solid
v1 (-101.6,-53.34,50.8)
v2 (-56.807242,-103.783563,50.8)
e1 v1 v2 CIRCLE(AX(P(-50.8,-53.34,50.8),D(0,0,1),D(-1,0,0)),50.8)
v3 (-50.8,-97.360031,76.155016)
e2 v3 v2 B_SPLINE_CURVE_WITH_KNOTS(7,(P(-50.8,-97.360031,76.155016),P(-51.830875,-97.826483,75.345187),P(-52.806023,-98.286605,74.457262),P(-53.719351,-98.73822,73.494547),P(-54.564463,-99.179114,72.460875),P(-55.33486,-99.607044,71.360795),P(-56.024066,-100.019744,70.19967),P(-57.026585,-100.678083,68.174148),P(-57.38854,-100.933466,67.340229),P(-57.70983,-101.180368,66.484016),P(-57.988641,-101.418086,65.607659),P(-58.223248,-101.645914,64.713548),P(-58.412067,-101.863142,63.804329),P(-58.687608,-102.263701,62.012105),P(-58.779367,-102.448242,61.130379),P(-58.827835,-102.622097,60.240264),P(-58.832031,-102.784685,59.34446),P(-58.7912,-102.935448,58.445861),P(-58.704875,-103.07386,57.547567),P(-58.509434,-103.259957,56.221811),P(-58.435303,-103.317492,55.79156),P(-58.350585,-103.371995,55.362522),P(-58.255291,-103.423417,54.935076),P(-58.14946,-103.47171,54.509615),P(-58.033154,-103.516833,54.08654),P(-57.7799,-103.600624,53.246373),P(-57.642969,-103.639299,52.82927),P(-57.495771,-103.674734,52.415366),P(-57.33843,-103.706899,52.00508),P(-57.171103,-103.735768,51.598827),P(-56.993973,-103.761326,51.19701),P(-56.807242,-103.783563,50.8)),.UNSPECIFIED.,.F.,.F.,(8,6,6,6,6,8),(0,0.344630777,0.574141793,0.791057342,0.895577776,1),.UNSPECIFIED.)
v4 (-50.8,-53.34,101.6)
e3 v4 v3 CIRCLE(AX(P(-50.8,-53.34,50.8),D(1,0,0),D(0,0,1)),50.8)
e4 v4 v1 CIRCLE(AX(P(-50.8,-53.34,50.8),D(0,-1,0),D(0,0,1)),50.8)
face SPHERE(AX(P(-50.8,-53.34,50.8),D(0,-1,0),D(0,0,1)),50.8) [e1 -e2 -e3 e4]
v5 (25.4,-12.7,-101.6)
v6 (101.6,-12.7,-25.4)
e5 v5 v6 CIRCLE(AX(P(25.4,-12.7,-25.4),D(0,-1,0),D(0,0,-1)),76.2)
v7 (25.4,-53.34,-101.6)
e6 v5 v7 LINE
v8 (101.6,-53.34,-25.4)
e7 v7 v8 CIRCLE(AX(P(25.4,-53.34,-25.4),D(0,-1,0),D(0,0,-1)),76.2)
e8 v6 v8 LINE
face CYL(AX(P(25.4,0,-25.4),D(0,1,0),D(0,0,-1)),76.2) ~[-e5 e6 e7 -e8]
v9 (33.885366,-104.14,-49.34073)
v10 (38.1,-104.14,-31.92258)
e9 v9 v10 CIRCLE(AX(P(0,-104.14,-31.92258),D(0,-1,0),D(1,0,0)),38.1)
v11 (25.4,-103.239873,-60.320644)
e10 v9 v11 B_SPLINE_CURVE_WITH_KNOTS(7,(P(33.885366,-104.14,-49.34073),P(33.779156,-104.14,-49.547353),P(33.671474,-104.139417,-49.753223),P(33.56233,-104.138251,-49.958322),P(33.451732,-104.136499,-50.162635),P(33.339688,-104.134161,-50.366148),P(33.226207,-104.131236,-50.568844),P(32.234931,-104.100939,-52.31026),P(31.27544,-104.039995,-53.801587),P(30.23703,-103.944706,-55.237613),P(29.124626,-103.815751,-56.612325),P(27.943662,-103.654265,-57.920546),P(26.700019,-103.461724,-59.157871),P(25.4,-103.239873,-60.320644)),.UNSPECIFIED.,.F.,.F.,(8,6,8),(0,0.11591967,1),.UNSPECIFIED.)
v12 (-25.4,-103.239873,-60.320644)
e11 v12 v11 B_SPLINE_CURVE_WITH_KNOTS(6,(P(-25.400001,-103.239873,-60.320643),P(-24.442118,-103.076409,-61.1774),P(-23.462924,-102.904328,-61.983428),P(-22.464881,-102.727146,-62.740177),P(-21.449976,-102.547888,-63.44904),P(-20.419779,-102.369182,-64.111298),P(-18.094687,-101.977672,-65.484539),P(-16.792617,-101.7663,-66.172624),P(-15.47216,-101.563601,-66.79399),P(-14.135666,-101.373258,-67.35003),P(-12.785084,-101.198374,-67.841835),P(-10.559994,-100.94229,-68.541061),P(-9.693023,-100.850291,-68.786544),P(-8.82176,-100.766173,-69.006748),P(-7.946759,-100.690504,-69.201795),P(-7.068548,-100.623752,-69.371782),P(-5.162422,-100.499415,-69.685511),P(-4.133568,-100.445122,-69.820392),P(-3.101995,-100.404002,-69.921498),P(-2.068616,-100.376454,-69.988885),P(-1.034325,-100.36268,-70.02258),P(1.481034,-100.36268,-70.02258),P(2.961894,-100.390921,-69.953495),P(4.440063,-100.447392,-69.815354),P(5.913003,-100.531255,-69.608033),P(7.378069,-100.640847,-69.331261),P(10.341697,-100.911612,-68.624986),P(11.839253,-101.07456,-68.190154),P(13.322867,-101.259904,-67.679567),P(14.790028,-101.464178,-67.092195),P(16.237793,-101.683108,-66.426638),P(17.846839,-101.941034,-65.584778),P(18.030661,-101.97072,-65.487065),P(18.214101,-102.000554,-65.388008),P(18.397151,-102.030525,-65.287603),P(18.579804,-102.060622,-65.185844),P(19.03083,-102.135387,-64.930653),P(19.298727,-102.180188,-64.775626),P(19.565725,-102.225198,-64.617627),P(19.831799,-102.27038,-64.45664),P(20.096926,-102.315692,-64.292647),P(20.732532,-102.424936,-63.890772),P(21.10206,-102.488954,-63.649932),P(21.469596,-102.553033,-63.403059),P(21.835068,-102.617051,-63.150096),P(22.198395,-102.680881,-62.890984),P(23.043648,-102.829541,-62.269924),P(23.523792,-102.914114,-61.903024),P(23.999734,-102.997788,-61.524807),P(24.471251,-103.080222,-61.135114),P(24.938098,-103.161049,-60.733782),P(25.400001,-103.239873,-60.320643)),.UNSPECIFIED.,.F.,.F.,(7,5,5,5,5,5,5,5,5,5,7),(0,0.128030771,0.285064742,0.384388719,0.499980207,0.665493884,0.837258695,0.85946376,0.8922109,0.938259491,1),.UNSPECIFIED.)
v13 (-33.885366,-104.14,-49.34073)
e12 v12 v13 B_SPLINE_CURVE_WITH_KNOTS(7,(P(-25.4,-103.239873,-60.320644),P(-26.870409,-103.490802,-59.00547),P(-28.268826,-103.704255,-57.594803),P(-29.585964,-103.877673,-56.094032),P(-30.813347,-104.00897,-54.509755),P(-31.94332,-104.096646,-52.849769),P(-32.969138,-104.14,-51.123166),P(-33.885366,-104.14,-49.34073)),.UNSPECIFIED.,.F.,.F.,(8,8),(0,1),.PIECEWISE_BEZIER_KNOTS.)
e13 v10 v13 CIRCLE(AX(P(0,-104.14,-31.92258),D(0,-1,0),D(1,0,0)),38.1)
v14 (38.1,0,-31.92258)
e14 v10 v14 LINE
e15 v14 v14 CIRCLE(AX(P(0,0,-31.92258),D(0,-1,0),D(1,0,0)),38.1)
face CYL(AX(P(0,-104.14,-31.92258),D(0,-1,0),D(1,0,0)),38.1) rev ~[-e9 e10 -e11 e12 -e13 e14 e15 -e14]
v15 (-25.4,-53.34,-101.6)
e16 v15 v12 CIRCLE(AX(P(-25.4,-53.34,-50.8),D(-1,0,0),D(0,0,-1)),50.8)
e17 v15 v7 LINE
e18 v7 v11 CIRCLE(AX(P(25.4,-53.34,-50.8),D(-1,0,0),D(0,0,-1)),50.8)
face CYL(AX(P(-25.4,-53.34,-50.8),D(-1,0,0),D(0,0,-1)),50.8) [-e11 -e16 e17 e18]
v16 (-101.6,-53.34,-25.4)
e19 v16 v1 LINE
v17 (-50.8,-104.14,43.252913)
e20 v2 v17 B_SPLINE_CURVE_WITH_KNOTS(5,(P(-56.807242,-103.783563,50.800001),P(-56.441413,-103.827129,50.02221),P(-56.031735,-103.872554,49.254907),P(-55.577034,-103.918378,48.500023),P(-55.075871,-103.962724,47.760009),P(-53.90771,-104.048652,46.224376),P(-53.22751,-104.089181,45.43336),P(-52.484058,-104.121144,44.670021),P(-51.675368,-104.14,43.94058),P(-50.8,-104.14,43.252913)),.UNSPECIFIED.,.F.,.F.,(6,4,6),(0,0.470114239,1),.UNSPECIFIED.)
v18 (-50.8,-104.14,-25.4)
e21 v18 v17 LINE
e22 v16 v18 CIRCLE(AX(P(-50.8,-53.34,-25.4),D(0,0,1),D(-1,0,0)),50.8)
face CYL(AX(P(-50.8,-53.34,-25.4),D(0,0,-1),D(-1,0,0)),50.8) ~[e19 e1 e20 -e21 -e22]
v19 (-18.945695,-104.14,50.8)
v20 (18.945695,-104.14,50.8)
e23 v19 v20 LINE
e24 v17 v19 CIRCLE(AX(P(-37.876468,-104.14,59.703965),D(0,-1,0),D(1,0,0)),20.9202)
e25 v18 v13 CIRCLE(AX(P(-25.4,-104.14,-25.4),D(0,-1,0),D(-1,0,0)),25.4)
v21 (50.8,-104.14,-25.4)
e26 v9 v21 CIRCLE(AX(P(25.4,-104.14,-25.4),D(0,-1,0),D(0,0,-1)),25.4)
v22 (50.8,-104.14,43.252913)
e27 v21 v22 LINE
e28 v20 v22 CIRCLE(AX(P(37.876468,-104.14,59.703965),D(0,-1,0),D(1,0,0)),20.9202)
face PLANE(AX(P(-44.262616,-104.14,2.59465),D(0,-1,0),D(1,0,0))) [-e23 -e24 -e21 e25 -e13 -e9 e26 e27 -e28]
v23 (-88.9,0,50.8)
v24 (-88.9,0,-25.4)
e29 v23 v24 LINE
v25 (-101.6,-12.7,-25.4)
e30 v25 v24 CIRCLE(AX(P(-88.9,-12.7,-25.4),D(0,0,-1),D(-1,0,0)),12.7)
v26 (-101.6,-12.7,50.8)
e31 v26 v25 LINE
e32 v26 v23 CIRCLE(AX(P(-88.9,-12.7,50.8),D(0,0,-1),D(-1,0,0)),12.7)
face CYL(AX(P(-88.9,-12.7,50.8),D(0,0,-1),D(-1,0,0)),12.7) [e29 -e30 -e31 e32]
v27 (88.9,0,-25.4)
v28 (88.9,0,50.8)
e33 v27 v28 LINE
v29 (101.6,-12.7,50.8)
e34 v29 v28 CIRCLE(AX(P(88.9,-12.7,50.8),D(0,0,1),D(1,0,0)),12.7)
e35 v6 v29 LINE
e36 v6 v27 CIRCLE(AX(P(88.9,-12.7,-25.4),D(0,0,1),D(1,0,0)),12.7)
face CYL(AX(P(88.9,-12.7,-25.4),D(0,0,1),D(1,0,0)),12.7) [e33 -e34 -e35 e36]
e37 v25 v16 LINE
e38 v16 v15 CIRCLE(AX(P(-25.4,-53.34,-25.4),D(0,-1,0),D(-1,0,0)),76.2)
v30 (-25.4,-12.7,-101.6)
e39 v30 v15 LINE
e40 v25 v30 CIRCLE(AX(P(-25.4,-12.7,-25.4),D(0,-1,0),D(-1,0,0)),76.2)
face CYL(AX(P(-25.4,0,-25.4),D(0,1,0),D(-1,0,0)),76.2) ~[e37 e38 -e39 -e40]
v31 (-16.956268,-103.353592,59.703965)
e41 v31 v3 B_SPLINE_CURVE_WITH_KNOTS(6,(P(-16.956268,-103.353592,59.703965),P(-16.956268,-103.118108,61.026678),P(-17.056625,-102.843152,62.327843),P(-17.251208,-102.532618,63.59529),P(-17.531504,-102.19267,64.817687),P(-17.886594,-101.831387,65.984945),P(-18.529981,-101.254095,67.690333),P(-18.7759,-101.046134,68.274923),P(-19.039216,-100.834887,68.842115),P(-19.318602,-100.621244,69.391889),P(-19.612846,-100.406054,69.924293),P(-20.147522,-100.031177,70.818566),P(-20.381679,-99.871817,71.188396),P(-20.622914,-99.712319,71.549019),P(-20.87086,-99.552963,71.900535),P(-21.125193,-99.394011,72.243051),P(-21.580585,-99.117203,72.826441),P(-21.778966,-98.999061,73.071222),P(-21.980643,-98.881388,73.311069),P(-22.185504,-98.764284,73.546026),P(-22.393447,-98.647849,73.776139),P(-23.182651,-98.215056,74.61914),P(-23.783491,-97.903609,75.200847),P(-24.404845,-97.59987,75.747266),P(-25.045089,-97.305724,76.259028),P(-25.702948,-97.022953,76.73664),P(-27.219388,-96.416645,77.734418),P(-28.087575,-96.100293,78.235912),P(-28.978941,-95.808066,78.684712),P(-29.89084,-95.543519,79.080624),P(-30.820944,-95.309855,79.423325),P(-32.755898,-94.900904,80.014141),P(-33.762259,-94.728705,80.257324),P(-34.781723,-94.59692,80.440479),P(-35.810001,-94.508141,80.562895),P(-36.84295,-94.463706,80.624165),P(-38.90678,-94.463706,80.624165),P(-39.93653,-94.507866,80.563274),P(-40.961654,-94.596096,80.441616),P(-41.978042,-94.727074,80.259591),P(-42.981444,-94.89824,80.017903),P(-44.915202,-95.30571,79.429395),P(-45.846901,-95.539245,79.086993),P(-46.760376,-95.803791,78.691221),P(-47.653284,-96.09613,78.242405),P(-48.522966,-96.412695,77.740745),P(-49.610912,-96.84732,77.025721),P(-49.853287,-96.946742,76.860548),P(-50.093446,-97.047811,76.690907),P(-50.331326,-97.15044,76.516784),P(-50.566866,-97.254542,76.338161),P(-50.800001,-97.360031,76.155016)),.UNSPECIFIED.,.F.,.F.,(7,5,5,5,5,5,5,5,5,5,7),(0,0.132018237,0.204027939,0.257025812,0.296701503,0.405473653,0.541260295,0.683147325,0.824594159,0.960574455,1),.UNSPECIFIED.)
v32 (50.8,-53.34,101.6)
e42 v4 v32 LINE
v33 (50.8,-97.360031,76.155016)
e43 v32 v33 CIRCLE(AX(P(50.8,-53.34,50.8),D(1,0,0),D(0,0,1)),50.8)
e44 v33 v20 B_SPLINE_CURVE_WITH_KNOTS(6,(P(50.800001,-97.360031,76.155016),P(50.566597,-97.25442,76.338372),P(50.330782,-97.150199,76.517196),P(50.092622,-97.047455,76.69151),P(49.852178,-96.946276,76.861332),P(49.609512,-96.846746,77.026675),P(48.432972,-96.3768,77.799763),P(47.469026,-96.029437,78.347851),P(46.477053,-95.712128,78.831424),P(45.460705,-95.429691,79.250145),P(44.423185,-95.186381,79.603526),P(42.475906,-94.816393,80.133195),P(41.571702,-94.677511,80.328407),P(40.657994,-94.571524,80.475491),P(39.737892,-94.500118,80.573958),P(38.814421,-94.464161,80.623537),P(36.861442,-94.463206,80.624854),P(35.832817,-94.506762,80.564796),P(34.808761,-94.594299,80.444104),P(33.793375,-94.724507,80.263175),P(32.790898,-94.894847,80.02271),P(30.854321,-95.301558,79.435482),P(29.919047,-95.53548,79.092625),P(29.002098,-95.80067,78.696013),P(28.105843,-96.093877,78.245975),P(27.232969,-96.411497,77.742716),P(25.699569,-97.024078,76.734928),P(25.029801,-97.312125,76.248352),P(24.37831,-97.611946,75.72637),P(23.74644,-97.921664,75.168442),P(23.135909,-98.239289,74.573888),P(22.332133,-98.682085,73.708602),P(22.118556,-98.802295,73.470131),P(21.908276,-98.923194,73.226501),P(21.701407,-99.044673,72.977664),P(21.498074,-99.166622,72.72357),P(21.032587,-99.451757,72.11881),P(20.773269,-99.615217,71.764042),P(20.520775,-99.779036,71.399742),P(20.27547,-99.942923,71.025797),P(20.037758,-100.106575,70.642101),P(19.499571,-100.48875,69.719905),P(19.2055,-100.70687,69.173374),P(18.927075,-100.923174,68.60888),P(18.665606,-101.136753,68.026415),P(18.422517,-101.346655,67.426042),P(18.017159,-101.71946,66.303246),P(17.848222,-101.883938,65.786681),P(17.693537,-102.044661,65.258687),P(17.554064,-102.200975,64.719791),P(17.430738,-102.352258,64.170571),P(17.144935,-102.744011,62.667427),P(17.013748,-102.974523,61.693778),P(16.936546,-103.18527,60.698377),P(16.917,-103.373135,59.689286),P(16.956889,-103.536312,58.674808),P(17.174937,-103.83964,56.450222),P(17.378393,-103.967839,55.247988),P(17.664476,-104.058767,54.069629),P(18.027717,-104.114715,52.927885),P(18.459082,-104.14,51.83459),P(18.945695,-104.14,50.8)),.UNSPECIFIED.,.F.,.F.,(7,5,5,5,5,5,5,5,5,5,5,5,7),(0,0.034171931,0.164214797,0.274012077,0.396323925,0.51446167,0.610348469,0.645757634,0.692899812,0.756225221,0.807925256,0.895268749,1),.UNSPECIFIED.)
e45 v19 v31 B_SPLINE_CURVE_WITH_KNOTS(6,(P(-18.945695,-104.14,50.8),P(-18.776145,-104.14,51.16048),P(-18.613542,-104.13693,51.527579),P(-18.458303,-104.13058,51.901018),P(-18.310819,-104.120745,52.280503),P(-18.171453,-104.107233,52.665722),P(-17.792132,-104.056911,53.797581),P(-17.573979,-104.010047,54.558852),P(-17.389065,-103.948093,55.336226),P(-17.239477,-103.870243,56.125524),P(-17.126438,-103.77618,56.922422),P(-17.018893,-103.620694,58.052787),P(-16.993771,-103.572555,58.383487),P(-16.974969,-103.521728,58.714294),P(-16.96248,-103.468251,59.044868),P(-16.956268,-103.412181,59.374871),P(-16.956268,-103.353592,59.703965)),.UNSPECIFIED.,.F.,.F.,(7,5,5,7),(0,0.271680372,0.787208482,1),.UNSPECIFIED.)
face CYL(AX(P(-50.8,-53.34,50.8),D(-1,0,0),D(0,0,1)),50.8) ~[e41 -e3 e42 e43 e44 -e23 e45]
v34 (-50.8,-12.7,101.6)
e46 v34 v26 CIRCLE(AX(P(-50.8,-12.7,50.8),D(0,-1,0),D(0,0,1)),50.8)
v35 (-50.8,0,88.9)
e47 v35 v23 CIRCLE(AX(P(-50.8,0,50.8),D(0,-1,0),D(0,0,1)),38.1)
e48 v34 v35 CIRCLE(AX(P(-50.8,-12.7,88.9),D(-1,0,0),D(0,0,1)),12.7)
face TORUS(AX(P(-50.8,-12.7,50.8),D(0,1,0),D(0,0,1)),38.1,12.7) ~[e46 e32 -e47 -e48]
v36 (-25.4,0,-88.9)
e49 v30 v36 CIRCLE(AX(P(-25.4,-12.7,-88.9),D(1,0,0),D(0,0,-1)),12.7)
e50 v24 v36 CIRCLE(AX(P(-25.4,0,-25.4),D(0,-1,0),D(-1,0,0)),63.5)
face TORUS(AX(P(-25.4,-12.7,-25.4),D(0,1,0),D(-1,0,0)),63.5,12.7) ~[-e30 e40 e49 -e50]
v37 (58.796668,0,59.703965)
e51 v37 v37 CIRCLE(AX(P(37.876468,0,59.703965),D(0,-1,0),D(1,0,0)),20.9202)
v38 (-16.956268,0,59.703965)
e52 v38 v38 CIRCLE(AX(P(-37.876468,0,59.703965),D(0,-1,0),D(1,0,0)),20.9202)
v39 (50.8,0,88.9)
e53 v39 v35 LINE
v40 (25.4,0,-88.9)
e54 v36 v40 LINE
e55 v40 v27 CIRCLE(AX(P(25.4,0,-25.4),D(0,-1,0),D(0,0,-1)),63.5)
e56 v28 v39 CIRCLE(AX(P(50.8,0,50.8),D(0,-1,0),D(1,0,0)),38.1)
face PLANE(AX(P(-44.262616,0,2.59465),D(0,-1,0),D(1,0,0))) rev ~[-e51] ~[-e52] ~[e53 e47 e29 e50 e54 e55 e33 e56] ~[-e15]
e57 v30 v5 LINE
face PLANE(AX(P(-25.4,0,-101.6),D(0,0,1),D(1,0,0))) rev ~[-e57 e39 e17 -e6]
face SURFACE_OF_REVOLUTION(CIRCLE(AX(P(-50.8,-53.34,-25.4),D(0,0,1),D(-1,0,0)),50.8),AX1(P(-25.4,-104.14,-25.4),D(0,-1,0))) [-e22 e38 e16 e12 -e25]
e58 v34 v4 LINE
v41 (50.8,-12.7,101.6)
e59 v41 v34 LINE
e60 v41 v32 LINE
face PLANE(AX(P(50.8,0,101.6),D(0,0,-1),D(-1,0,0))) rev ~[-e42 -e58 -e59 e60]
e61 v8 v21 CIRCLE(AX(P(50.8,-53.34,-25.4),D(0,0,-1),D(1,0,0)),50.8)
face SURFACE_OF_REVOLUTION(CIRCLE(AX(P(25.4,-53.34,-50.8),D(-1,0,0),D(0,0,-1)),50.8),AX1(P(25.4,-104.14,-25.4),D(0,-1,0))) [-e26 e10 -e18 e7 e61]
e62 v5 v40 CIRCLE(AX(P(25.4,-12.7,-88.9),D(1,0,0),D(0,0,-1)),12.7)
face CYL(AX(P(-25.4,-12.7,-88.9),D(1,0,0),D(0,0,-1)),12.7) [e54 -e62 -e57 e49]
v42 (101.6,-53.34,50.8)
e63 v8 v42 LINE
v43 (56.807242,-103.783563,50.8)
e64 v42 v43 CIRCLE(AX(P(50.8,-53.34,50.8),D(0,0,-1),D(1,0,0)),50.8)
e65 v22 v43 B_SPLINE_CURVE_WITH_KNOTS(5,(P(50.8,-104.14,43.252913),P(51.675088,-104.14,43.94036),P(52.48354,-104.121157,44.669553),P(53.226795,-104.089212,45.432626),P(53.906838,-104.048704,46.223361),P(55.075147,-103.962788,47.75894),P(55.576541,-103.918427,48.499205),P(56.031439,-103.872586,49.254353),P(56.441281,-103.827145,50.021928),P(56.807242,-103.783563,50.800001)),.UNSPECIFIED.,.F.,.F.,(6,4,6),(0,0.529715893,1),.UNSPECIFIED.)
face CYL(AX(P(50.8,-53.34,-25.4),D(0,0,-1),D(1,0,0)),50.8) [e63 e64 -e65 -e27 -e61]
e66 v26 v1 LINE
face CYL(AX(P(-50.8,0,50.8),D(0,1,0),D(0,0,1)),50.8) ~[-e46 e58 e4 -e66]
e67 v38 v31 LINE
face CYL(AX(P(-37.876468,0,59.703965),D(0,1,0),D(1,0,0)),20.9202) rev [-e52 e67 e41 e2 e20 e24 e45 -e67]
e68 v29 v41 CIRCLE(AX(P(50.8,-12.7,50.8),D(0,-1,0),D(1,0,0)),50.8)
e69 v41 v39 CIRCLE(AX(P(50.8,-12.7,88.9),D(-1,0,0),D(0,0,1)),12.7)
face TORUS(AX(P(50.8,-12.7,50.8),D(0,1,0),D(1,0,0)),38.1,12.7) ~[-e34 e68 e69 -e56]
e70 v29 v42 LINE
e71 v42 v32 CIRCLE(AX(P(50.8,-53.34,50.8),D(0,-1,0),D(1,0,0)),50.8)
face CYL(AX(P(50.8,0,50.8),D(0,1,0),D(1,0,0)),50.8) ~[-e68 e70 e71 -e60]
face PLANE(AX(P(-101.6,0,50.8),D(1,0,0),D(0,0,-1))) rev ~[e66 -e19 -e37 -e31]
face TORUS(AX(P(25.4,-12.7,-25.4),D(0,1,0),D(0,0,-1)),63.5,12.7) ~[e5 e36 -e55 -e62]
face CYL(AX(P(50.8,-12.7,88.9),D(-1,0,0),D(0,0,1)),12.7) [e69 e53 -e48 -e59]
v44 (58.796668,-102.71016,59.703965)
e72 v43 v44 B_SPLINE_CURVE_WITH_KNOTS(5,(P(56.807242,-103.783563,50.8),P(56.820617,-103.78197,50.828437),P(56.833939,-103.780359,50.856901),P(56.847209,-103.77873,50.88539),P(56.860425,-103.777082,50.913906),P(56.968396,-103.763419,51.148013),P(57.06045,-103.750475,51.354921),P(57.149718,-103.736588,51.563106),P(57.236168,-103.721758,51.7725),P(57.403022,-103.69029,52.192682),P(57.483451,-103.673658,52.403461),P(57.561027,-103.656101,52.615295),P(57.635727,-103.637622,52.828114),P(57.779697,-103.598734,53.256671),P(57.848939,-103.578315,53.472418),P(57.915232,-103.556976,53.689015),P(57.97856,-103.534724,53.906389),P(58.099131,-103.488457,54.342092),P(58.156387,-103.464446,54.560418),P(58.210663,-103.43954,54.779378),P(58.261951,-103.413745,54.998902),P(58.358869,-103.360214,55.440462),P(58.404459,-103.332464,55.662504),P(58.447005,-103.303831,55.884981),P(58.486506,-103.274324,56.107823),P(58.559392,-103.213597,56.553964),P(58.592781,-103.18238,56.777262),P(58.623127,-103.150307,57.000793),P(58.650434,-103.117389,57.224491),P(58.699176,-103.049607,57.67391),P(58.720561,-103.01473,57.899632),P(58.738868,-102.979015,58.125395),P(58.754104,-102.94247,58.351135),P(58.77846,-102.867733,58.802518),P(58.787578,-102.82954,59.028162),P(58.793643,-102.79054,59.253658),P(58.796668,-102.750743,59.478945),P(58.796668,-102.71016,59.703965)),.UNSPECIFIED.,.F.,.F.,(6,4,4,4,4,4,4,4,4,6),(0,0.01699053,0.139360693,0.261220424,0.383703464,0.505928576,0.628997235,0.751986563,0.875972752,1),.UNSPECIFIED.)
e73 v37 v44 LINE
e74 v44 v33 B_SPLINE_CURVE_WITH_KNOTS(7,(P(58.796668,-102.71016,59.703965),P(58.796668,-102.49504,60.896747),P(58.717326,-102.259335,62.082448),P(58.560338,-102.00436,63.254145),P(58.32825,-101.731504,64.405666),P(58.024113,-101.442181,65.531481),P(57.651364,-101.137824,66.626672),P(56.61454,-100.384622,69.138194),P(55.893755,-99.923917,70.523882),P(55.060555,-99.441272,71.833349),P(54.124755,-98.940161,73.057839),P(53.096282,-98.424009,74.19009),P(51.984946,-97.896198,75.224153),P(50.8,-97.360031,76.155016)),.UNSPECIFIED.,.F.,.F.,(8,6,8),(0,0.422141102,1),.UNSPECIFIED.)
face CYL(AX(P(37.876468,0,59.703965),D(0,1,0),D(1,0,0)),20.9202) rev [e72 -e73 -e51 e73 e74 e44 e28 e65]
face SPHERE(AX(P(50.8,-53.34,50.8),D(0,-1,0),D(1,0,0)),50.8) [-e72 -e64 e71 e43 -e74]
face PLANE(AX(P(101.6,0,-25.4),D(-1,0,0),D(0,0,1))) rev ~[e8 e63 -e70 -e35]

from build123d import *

# Parameters (mm, degrees)
F0_R         = 20.9202002185
F1_DEPTH     = 104.14
F2_T1_DEPTH  = 101.6
F2_T3_DEPTH  = 76.2
F2_T5_DEPTH  = 50.8
F2_T8_ANGLE  = 90
F2_T10_ANGLE = 90
F2_T12_ANGLE = 90
F2_T14_ANGLE = 90
F3_R         = 12.7
F4_R         = 38.1
F5_DEPTH     = 104.1410001


# Not quite as in the source:
# - a fillet or chamfer that OpenCascade refuses, or shapes differently, is made with other operations: its cross-section is extruded or revolved along the edge and cut away or added


with BuildPart() as f1:
    # F0 (on Front) → F1 (new body)
    with BuildSketch(Plane.XZ):
        with BuildLine():
            Line((0, 101.6), (-50.8, 101.6))
            ThreePointArc((-50.8, 101.6), (-86.7210244843, 86.7210244843), (-101.6, 50.8))
            Line((-101.6, 50.8), (-101.6, -25.4))
            ThreePointArc((-101.6, -25.4), (-79.2815367264, -79.2815367264), (-25.4, -101.6))
            Line((-25.4, -101.6), (0, -101.6))
            Line((0, -101.6), (0, 101.6))
        make_face()
        with Locations((-37.8764681518, 59.70396474)):
            Circle(F0_R, mode=Mode.SUBTRACT)
        with BuildLine():
            Line((50.8, 101.6), (0, 101.6))
            Line((0, 101.6), (0, -101.6))
            Line((0, -101.6), (25.4, -101.6))
            ThreePointArc((25.4, -101.6), (79.2815367264, -79.2815367264), (101.6, -25.4))
            Line((101.6, -25.4), (101.6, 50.8))
            ThreePointArc((101.6, 50.8), (86.7210244843, 86.7210244843), (50.8, 101.6))
        make_face()
        with Locations((37.8764681518, 59.70396474)):
            Circle(F0_R, mode=Mode.SUBTRACT)
    extrude(amount=F1_DEPTH)

    # F2: fillet of radius 50.8 on 1 edges, made by hand

    # F2_s2 → F2_t1 (cut)
    with BuildSketch(Plane.YZ.offset(-50.8)):
        with BuildLine():
            ThreePointArc((-53.34, 101.6), (-89.2610244843, 86.7210244843), (-104.14, 50.8))
            Line((-104.14, 50.8), (-104.14, 101.6))
            Line((-104.14, 101.6), (-53.34, 101.6))
        make_face()
    extrude(amount=F2_T1_DEPTH, mode=Mode.SUBTRACT)

    # F2_s4 → F2_t3 (cut)
    with BuildSketch(Plane.XY.offset(-25.4)):
        with BuildLine():
            ThreePointArc((-101.6, -53.34), (-86.7210244843, -89.2610244843), (-50.8, -104.14))
            Line((-50.8, -104.14), (-101.6, -104.14))
            Line((-101.6, -104.14), (-101.6, -53.34))
        make_face()
        with BuildLine():
            ThreePointArc((101.6, -53.34), (86.7210244843, -89.2610244843), (50.8, -104.14))
            Line((50.8, -104.14), (101.6, -104.14))
            Line((101.6, -104.14), (101.6, -53.34))
        make_face()
    extrude(amount=F2_T3_DEPTH, mode=Mode.SUBTRACT)

    # F2_s6 → F2_t5 (cut)
    with BuildSketch(Plane.YZ.offset(-25.4)):
        with BuildLine():
            ThreePointArc((-53.34, -101.6), (-89.2610244843, -86.7210244843), (-104.14, -50.8))
            Line((-104.14, -50.8), (-104.14, -101.6))
            Line((-104.14, -101.6), (-53.34, -101.6))
        make_face()
    extrude(amount=F2_T5_DEPTH, mode=Mode.SUBTRACT)

    # F2_s7 → F2_t8 (revolve, cut)
    with BuildSketch(Plane.YZ.offset(-50.8)):
        with BuildLine():
            ThreePointArc((-53.34, 101.6), (-89.2610244843, 86.7210244843), (-104.14, 50.8))
            Line((-104.14, 50.8), (-104.14, 101.6))
            Line((-104.14, 101.6), (-53.34, 101.6))
        make_face()
    revolve(axis=Axis((-50.8, -104.14, 50.8), (0, -1, 0)), revolution_arc=F2_T8_ANGLE, mode=Mode.SUBTRACT)

    # F2_s9 → F2_t10 (revolve, cut)
    with BuildSketch(Plane.XY.offset(-25.4)):
        with BuildLine():
            ThreePointArc((-101.6, -53.34), (-86.7210244843, -89.2610244843), (-50.8, -104.14))
            Line((-50.8, -104.14), (-101.6, -104.14))
            Line((-101.6, -104.14), (-101.6, -53.34))
        make_face()
    revolve(axis=Axis((-25.4, -104.14, -25.4), (0, -1, 0)), revolution_arc=F2_T10_ANGLE, mode=Mode.SUBTRACT)

    # F2_s11 → F2_t12 (revolve, cut)
    with BuildSketch(Plane.YZ.offset(25.4)):
        with BuildLine():
            ThreePointArc((-53.34, -101.6), (-89.2610244843, -86.7210244843), (-104.14, -50.8))
            Line((-104.14, -50.8), (-104.14, -101.6))
            Line((-104.14, -101.6), (-53.34, -101.6))
        make_face()
    revolve(axis=Axis((25.4, -104.14, -25.4), (0, -1, 0)), revolution_arc=F2_T12_ANGLE, mode=Mode.SUBTRACT)

    # F2_s13 → F2_t14 (revolve, cut)
    with BuildSketch(Plane.XY.offset(50.8)):
        with BuildLine():
            ThreePointArc((101.6, -53.34), (86.7210244843, -89.2610244843), (50.8, -104.14))
            Line((50.8, -104.14), (101.6, -104.14))
            Line((101.6, -104.14), (101.6, -53.34))
        make_face()
    revolve(axis=Axis((50.8, -104.14, 50.8), (0, -1, 0)), revolution_arc=F2_T14_ANGLE, mode=Mode.SUBTRACT)

    # F3
    f3_edges = [f1.edges().sort_by_distance(p)[0] for p in [
        (-86.721024, 0, 86.721024),
    ]]
    fillet(f3_edges, radius=F3_R)

    # F4 (on face) → F5 (cut, through all)
    with BuildSketch(Plane.XZ.offset(104.14)):
        with Locations((0, -31.9225803405)):
            Circle(F4_R)
    extrude(amount=-F5_DEPTH, mode=Mode.SUBTRACT)


solid = f1.part
